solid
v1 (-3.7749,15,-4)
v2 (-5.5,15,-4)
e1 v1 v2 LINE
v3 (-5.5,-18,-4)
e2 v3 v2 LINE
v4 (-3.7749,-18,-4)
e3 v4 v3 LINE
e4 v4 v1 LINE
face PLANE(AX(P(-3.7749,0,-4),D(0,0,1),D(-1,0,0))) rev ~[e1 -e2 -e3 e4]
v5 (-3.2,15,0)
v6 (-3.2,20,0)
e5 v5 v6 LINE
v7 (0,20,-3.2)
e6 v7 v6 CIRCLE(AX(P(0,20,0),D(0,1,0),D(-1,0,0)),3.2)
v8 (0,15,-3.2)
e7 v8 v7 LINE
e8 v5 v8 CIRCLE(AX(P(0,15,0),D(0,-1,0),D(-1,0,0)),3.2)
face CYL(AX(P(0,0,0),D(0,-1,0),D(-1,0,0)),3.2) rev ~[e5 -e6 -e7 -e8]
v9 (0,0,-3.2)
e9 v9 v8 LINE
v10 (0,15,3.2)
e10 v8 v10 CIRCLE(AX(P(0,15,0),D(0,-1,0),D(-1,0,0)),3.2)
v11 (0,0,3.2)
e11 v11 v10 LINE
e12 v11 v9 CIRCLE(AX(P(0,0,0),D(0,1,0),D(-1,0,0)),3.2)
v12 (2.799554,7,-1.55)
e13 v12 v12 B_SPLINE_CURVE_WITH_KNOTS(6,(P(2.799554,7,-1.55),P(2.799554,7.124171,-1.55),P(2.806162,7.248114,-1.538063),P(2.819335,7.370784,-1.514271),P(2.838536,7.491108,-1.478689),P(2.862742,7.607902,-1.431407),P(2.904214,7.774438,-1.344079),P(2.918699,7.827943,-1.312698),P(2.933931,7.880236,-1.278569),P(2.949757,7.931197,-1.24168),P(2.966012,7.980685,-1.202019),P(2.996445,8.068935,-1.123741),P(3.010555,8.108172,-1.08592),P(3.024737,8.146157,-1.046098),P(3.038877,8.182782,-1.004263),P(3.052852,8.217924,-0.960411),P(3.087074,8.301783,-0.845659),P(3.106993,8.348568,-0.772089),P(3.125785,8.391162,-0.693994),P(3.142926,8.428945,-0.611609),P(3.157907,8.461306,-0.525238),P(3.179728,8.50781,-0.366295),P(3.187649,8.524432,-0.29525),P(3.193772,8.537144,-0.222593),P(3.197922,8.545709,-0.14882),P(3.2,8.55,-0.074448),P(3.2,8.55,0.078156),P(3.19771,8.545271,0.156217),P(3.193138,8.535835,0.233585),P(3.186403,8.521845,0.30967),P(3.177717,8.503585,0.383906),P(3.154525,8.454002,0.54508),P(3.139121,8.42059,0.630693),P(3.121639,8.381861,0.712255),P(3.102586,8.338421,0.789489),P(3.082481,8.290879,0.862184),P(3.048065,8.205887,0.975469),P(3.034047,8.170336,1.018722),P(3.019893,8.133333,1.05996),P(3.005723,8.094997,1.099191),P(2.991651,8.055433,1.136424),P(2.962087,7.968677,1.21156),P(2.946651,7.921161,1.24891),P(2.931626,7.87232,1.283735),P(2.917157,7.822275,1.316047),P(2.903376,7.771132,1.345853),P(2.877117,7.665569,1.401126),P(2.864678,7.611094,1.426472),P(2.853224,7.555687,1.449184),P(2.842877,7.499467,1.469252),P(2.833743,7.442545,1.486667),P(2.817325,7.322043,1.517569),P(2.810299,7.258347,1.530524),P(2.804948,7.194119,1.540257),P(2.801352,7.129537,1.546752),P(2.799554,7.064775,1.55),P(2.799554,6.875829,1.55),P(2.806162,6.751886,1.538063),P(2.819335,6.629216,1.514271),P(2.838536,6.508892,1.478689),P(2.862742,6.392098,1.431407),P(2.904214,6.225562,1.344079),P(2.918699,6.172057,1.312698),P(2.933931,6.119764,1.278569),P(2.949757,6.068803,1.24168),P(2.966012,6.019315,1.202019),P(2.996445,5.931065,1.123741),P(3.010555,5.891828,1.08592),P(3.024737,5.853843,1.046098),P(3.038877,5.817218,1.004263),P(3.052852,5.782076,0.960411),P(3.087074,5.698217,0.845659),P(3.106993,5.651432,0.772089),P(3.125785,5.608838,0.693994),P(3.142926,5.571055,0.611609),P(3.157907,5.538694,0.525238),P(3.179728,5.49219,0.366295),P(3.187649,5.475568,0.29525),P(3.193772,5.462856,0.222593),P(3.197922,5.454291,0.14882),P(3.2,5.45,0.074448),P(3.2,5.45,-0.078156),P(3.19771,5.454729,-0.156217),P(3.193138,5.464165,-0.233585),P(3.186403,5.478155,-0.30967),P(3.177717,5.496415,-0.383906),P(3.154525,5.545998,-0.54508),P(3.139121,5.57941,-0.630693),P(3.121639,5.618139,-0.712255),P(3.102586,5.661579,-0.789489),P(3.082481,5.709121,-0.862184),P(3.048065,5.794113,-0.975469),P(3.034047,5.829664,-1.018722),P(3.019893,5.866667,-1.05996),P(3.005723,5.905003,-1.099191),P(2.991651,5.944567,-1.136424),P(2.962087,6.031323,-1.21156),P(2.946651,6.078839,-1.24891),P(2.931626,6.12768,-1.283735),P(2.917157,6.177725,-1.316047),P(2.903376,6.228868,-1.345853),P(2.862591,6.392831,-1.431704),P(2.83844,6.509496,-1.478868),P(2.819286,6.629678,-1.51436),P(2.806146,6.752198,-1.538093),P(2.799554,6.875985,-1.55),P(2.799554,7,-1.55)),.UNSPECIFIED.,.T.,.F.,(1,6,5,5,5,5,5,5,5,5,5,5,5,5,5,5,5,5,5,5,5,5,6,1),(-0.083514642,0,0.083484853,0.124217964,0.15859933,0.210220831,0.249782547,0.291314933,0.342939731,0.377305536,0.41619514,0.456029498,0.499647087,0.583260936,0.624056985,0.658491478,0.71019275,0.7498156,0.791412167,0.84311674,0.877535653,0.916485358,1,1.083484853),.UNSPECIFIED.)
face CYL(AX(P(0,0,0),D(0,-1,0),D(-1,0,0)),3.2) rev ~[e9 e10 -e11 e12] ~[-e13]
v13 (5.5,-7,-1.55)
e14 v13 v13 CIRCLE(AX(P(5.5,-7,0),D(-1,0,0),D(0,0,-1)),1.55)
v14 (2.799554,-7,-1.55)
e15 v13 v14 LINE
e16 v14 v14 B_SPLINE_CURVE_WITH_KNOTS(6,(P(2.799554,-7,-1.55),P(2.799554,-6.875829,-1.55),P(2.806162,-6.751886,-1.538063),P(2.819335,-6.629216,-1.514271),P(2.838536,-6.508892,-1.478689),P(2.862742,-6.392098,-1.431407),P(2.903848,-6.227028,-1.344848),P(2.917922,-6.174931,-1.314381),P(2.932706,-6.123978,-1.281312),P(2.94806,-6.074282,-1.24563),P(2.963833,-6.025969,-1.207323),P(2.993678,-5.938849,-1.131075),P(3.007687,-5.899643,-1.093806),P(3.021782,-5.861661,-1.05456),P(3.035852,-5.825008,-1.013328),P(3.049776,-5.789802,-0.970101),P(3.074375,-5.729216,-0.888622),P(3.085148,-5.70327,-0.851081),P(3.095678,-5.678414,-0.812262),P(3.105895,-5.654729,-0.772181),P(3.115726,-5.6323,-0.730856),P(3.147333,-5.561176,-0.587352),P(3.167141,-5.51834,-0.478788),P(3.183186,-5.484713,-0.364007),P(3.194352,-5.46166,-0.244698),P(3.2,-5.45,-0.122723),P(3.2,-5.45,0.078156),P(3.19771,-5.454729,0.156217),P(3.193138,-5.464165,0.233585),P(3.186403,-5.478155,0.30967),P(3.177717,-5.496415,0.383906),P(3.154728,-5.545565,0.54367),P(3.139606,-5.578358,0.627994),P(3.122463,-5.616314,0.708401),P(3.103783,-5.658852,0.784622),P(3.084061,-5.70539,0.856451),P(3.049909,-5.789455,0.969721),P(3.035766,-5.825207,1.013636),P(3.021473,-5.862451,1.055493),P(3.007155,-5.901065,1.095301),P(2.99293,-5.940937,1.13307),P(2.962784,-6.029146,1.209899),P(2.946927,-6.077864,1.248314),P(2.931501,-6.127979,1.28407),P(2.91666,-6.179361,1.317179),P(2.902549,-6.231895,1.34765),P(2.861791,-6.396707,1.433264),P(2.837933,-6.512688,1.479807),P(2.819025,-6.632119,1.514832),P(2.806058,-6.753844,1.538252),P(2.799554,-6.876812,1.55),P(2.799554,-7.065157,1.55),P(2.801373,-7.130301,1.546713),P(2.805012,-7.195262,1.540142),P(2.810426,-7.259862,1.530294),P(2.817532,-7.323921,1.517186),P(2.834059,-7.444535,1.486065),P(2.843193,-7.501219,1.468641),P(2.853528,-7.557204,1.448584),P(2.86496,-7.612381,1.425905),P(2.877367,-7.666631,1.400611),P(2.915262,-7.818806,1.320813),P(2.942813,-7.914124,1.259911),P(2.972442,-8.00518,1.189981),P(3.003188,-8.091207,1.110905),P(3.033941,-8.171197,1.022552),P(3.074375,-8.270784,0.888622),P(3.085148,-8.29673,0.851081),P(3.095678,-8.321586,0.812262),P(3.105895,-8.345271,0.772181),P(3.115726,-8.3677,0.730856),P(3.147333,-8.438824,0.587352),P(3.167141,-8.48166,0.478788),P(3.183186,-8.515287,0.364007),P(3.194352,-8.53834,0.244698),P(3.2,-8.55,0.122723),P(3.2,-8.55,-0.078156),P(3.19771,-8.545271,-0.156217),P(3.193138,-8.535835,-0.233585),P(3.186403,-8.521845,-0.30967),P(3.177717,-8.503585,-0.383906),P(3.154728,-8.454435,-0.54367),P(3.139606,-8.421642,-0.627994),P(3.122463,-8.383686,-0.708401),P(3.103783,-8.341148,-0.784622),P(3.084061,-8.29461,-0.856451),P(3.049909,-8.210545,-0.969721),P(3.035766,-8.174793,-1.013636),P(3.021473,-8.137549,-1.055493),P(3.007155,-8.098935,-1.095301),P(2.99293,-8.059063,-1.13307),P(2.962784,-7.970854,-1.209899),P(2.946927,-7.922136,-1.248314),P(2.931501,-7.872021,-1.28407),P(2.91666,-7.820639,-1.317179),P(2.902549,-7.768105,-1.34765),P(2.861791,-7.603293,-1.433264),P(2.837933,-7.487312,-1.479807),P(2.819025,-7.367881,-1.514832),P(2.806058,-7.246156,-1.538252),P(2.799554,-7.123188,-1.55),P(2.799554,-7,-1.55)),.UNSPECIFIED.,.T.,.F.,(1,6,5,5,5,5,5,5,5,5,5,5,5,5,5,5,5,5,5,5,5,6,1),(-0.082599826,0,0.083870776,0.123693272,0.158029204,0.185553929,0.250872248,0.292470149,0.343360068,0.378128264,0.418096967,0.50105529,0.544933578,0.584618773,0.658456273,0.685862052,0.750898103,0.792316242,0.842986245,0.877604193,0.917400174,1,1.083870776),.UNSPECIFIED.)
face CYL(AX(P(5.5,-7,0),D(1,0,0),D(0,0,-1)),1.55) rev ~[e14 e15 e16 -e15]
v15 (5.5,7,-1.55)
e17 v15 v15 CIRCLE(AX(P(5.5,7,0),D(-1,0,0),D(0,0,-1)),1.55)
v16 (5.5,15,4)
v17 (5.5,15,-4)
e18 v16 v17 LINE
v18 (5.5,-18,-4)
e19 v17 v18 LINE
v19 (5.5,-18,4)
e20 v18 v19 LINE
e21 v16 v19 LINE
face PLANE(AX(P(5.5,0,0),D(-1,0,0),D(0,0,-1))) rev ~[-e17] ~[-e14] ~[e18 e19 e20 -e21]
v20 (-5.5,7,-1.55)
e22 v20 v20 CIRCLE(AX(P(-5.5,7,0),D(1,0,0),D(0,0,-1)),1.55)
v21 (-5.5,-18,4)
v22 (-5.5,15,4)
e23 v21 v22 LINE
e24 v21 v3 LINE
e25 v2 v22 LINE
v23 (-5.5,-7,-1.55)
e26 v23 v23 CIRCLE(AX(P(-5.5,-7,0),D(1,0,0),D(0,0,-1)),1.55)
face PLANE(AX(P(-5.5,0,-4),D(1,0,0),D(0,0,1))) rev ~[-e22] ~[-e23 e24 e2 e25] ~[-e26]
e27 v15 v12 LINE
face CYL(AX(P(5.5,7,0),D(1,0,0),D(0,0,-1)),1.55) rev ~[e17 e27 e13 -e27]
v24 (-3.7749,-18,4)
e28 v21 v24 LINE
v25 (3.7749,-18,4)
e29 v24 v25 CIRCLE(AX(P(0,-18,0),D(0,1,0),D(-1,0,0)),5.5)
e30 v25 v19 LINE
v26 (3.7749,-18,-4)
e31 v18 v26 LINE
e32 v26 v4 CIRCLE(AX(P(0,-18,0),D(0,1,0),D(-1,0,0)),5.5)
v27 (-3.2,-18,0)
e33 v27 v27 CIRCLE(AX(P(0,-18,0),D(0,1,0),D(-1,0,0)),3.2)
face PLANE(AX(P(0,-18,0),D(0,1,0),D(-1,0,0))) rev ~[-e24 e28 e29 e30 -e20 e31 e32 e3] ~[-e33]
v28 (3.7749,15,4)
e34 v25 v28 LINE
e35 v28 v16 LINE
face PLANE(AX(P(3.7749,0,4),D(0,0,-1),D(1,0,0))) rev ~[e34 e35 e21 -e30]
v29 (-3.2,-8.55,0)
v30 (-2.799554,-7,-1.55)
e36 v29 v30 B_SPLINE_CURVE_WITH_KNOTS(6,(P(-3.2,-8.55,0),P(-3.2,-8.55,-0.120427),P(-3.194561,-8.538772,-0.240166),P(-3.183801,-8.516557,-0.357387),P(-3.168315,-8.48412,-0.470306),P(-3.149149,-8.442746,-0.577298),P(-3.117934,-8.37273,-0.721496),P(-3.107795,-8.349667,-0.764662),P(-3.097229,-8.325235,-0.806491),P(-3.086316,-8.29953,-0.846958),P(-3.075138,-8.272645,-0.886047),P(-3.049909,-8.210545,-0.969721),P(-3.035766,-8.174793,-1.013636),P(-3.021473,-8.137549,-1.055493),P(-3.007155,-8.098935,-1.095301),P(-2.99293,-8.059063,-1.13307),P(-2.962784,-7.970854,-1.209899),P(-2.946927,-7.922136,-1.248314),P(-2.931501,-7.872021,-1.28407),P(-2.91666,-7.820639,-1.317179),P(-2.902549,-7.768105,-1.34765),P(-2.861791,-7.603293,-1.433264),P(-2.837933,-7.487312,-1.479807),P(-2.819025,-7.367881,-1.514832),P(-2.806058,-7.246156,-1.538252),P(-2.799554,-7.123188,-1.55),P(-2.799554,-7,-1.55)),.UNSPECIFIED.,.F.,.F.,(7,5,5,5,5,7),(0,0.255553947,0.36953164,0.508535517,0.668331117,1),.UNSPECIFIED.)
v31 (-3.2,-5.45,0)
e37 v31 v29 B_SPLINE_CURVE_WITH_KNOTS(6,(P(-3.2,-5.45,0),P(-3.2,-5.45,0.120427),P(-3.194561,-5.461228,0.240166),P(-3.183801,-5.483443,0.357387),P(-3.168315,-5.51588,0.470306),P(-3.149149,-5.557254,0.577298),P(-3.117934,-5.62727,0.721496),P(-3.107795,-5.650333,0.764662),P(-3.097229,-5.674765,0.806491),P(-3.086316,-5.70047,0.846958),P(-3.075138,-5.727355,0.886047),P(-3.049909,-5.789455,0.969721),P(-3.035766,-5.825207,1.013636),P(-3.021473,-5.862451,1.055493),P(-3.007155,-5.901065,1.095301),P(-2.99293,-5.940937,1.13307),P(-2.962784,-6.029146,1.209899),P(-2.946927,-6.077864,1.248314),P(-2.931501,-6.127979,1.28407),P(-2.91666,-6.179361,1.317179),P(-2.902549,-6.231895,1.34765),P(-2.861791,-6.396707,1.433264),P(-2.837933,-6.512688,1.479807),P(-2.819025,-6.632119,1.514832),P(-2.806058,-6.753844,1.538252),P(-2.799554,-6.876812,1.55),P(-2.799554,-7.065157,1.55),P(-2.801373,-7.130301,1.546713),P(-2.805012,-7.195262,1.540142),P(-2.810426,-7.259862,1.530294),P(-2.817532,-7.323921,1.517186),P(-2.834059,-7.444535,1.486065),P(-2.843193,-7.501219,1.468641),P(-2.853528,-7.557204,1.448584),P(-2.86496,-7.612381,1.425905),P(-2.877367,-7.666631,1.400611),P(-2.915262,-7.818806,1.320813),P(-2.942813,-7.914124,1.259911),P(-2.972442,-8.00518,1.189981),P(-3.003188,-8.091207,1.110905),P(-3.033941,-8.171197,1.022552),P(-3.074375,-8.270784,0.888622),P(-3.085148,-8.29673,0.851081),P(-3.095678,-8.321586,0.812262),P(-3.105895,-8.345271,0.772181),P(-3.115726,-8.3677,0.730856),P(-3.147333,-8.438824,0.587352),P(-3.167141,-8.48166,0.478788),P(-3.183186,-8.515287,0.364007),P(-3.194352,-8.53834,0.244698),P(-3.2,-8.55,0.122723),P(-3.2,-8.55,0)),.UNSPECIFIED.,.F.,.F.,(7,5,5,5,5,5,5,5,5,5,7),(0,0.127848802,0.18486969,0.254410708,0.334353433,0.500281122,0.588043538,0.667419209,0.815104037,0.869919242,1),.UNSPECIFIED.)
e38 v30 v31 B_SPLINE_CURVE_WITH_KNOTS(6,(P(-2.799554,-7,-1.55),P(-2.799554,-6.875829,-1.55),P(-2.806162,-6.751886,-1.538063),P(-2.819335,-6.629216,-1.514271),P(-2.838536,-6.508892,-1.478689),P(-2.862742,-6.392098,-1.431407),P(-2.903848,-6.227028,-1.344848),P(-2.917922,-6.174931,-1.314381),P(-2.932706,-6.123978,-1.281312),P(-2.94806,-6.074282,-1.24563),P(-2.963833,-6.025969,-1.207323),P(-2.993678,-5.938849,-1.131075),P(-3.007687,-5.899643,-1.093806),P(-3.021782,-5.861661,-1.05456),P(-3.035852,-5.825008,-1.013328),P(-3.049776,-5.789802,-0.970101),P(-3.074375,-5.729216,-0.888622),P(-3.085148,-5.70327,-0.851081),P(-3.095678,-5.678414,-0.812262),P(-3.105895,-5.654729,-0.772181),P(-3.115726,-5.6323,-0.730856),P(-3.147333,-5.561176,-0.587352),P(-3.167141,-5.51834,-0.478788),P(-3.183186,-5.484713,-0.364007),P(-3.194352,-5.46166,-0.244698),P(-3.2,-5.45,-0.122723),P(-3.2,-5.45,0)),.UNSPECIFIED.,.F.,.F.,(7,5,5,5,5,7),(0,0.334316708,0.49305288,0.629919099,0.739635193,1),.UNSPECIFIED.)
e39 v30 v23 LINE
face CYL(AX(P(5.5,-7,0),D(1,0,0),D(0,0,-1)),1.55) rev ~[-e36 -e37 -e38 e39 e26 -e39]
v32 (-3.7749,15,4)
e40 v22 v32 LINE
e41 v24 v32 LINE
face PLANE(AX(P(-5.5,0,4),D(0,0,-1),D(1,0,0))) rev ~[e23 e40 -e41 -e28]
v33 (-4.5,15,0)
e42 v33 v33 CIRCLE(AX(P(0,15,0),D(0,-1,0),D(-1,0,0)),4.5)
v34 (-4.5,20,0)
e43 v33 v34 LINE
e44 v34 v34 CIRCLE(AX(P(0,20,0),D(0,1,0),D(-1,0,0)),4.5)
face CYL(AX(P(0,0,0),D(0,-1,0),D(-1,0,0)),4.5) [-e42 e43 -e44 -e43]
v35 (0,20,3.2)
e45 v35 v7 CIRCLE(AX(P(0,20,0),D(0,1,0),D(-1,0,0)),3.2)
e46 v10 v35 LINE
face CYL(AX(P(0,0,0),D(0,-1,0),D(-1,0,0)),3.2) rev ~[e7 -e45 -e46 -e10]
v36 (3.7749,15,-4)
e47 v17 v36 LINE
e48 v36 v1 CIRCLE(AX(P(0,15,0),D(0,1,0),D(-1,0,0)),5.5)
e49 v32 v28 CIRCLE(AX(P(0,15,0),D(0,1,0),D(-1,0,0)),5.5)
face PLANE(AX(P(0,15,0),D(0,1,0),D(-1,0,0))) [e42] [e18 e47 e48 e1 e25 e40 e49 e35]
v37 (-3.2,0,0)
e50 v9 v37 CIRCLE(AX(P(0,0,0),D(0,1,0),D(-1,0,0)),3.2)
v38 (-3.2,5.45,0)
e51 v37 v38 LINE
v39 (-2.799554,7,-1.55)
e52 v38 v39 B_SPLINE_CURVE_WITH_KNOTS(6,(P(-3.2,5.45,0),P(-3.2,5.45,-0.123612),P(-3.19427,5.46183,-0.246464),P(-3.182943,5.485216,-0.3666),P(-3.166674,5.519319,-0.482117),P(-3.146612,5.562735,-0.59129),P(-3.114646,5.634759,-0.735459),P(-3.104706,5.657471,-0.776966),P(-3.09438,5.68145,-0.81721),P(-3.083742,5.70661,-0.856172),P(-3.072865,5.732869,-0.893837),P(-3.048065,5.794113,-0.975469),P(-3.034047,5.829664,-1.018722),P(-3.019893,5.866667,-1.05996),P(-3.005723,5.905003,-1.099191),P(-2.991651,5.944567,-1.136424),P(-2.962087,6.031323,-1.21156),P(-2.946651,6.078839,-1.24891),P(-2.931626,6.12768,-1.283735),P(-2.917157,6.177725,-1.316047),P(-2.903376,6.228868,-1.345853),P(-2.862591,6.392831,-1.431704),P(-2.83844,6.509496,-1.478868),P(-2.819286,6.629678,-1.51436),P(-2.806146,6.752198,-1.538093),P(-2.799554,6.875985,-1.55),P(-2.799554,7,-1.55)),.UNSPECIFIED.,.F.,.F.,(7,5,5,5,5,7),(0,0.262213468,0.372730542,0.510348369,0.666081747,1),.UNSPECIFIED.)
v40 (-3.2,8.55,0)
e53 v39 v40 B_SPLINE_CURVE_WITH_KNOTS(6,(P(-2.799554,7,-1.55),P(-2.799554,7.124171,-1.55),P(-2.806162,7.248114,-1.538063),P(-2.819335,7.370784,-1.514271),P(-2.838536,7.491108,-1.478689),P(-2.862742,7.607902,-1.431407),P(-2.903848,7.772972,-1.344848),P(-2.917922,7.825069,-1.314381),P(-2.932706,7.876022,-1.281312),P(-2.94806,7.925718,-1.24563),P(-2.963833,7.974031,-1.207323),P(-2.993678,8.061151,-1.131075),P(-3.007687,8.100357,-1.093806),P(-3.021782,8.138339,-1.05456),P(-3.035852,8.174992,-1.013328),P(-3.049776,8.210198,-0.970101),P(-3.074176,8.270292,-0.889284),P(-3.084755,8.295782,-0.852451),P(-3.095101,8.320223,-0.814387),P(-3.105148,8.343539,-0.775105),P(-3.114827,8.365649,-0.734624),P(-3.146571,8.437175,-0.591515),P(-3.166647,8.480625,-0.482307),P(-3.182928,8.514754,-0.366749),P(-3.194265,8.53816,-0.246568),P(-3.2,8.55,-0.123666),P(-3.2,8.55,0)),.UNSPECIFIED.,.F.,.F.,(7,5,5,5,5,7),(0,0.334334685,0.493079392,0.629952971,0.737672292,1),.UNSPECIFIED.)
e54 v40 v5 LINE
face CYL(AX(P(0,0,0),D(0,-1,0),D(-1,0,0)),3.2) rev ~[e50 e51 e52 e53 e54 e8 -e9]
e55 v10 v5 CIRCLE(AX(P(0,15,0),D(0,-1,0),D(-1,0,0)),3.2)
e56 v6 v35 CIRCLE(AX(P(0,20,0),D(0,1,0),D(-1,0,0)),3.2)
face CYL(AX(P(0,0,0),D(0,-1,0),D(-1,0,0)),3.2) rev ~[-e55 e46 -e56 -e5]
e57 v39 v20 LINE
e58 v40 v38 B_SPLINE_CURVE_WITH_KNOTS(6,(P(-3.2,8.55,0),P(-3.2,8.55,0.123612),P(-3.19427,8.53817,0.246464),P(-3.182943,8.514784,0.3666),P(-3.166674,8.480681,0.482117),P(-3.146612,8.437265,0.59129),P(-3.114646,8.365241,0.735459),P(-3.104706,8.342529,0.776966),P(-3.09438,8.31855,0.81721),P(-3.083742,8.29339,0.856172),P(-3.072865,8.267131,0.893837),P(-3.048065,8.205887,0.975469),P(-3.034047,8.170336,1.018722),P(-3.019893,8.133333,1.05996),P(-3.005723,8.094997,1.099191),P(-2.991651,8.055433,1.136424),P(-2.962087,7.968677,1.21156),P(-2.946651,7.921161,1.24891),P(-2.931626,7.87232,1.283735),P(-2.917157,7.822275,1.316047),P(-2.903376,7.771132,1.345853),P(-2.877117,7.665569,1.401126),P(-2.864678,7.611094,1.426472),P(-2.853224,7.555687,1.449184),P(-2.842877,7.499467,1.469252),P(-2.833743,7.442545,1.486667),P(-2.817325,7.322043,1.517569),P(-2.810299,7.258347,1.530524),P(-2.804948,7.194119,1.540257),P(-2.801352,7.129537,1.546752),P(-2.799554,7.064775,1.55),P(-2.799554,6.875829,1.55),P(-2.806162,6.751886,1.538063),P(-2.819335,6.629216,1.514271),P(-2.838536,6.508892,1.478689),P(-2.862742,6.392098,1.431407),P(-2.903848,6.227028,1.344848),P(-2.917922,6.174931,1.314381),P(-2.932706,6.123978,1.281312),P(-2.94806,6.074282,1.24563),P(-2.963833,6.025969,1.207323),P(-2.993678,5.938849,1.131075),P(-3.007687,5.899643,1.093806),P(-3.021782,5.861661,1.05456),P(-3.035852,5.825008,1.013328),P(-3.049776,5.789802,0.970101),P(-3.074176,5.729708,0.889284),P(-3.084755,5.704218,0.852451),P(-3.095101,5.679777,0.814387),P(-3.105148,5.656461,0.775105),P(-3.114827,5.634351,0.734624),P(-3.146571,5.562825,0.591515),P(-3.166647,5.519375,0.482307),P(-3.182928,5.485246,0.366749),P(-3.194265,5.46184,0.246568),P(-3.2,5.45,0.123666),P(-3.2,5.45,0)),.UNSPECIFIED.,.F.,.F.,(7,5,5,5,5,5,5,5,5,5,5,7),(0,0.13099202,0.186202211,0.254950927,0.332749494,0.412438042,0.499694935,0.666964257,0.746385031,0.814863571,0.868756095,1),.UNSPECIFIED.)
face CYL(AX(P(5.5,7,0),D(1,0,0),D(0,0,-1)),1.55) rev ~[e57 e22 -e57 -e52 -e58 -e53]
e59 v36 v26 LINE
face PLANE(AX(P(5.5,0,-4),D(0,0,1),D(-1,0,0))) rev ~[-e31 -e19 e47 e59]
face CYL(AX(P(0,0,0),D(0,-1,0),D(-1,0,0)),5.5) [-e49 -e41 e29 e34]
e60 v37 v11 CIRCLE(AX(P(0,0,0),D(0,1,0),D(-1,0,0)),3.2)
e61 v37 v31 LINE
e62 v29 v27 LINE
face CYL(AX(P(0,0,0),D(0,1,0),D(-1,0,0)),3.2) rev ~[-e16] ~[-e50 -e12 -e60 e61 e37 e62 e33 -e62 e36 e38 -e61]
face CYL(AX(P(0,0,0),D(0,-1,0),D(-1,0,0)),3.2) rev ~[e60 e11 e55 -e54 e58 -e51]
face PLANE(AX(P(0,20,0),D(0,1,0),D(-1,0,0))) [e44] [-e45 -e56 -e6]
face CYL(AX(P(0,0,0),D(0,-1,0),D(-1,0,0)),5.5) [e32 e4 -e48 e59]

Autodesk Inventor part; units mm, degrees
ref_plane "YZ Plane" through (0, 0, 0) normal (1, 0, 0) x (0, 1, 0)
ref_plane "XZ Plane" through (0, 0, 0) normal (0, 1, 0) x (-1, 0, 0)
ref_plane "XY Plane" through (0, 0, 0) normal (0, 0, 1) x (1, 0, 0)
sketch "Sketch1" plane through (0, 0, 0) normal (0, 1, 0) x (-1, 0, 0)
  circle A0 centre (0, 0) radius 3.2
  circle A1 centre (0, 0) radius 5.5
  line L0 (0, 0) -> (0, -3.2)
  line L1 (0, 0) -> (0, 4)
  line L2 (-3.7749, 4) -> (-5.5, 4)
  line L3 (-5.5, 4) -> (-5.5, -4)
  line L4 (-5.5, -4) -> (-3.7749, -4)
  line L5 (0, -4) -> (0, 0)
  line L6 (3.7749, -4) -> (5.5, -4)
  line L7 (5.5, -4) -> (5.5, 4)
  line L8 (5.5, 4) -> (3.7749, 4)
  circle A2 centre (0, 0) radius 4.5
  dimension "d0" = 6.4
  dimension "d1" = 11
  dimension "d13" = 4
  dimension "d14" = 8
  dimension "d15" = 8
  dimension "d18" = 9
extrude "Extrusion3" add sketch "Sketch1" along normal blind 15 and the other way blind 18 contours A1 | L7 L6 A1 | A1 L8 L7 | A1 L3 L2 | L4 L3 A1 | A2
extrude "Extrusion4" add sketch "Sketch1" along normal blind 20 contours A2
sketch "Sketch3" plane through (5.5, -18, -4) normal (1, 0, 0) x (0, 0, -1)
  line L0 (0, 0) -> (0, 33) projected
  line L1 (0, 15) -> (-4, 15)
  line L2 (-4, 18) -> (-4, 11)
  line L3 (-4, 18) -> (-4, 25)
  circle A0 centre (-4, 25) radius 1.55
  circle A1 centre (-4, 11) radius 1.55
  dimension "d21" = 7
  dimension "d22" = 7
  dimension "d23" = 3.1
  dimension "d24" = 3.1
extrude "Extrusion5" cut sketch "Sketch3" against normal blind 20
properties part number "shaft_to_shaft_coupler"
